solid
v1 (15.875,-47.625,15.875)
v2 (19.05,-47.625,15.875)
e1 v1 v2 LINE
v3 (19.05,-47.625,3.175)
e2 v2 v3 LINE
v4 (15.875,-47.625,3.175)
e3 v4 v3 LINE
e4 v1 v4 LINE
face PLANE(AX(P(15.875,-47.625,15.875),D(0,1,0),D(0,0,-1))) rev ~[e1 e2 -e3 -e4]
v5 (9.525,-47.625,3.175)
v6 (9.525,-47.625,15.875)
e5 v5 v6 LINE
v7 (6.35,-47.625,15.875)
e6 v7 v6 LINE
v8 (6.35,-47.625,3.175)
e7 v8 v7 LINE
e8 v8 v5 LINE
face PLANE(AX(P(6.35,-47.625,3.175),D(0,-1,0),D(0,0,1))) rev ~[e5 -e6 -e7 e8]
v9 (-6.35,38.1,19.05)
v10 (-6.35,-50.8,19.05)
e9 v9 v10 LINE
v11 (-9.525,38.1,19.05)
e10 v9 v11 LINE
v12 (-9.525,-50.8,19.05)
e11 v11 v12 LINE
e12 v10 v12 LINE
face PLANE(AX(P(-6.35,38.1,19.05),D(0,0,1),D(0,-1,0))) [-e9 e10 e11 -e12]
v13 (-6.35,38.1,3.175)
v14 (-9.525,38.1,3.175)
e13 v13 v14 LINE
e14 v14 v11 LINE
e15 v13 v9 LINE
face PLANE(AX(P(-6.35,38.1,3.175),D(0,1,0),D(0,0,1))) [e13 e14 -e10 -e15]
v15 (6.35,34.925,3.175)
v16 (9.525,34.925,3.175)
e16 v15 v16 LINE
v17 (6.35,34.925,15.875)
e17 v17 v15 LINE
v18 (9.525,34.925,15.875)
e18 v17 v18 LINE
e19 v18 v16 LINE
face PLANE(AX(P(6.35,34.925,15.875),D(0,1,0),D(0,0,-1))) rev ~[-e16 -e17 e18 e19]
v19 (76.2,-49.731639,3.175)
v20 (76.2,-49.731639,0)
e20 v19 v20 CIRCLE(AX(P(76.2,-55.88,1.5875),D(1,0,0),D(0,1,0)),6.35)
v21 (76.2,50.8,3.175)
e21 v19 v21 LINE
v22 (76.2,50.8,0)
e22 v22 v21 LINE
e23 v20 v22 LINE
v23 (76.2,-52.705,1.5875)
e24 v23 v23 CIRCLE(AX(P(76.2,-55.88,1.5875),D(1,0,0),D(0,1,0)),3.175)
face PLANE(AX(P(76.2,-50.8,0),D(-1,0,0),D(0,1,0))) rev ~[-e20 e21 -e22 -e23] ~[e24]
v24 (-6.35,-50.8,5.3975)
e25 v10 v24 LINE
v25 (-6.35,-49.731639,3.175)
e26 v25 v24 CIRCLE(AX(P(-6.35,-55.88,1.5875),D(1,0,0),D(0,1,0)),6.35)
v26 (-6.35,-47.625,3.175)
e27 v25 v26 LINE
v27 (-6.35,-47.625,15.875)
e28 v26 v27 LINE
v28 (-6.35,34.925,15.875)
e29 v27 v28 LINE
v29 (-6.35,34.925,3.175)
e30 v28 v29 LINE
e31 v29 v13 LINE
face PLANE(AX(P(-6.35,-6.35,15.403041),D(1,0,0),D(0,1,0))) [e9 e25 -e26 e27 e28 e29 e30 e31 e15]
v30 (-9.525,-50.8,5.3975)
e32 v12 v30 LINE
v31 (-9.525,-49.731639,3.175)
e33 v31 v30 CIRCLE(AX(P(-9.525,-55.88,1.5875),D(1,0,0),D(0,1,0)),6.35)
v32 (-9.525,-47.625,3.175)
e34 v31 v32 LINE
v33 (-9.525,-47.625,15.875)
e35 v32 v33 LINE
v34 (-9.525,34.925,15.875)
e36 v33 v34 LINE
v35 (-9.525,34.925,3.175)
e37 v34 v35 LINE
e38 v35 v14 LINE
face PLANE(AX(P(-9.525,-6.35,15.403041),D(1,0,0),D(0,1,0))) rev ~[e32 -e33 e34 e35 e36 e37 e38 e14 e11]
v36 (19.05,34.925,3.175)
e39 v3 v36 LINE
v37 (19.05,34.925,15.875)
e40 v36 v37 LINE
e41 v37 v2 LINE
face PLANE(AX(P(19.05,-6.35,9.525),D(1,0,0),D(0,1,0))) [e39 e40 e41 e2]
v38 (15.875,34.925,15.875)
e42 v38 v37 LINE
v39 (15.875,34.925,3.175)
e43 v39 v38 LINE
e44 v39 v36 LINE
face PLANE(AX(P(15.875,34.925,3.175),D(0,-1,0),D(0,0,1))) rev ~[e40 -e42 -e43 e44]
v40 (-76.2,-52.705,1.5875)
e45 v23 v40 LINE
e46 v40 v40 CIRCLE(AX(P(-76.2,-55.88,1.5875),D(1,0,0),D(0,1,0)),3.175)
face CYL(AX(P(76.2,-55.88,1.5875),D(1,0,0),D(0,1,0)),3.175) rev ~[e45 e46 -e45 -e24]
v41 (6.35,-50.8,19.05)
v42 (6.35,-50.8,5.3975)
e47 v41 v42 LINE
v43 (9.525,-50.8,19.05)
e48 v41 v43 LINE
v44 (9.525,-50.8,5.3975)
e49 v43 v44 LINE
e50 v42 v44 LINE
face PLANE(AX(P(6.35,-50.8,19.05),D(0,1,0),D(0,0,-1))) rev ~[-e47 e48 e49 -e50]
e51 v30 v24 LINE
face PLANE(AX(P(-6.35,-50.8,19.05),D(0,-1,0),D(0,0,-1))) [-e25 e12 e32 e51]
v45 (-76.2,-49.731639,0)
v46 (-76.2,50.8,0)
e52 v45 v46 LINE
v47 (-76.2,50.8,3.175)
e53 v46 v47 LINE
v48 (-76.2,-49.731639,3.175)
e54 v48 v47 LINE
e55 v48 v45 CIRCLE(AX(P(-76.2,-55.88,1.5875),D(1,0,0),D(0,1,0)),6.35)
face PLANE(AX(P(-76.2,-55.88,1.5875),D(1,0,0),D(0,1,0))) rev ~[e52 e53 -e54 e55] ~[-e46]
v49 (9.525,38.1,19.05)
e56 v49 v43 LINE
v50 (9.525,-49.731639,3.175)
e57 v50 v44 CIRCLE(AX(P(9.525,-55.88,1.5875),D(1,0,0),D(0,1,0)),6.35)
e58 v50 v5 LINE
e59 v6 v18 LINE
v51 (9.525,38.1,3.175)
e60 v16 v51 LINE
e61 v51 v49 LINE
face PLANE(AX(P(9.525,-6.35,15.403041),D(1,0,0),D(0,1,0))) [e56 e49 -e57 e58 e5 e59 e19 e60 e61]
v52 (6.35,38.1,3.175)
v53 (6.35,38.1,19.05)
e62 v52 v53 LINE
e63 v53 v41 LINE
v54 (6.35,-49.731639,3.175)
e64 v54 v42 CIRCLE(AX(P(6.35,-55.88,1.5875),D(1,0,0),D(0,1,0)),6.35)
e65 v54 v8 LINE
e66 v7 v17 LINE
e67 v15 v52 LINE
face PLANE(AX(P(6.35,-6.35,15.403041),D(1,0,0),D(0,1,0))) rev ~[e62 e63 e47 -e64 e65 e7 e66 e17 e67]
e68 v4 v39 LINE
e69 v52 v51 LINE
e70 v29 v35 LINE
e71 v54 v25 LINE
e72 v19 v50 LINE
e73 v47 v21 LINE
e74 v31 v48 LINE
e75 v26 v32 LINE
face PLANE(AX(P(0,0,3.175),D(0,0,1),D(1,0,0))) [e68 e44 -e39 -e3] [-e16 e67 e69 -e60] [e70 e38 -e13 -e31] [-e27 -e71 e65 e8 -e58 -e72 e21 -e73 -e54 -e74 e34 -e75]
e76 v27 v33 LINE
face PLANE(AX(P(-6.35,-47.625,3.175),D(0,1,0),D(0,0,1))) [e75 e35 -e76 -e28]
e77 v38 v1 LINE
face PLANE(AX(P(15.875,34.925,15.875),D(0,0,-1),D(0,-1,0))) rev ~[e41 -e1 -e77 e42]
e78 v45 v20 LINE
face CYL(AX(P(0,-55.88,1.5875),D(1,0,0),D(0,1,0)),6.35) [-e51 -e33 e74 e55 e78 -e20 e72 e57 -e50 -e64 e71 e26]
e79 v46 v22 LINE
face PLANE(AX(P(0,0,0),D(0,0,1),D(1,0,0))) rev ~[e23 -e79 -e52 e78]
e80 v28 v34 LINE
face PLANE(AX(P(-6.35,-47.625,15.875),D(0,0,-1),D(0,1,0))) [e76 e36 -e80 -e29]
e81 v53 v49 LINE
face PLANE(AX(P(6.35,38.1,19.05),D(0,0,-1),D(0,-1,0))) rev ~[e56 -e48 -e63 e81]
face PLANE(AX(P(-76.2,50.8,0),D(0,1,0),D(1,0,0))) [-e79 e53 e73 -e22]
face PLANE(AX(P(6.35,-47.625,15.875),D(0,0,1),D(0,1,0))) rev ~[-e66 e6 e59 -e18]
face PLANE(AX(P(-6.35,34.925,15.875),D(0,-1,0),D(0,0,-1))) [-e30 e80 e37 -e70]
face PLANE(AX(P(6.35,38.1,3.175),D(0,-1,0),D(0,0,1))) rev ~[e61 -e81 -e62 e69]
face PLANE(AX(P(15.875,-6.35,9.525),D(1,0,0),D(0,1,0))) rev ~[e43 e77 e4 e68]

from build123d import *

# Parameters (mm, degrees)
F0_W      = 152.4
F0_H      = 101.6
F1_DEPTH  = 3.175
F2_R      = 6.35
F3_DEPTH  = 76.2
F4_DEPTH  = 76.2
F5_R      = 3.175
F6_DEPTH  = 152.4
F10_DEPTH = 3.175
F13_DEPTH = 3.175
F16_DEPTH = 3.175


# Not quite as in the source:
# - a feature names something its author has since deleted; it is built from what else it names


with BuildPart() as f1:
    # F0 (on Top) → F1 (new body)
    with BuildSketch(Plane.XY):
        Rectangle(F0_W, F0_H)
    extrude(amount=F1_DEPTH)

    # F2 (on Right) → F3 (join)
    with BuildSketch(Plane.YZ):
        with Locations((-55.88, 1.5875)):
            Circle(F2_R)
    extrude(amount=F3_DEPTH)

    # F4 (add): a face of the model
    f4_faces = [f1.faces().sort_by_distance(p)[0] for p in [
        (0, -56.0567159254, 1.5875),
    ]]
    extrude(f4_faces, amount=F4_DEPTH)

    # F5 (on face) → F6 (cut)
    with BuildSketch(Plane.YZ.offset(76.2)):
        with Locations((-55.88, 1.5875)):
            Circle(F5_R)
    extrude(amount=-F6_DEPTH, mode=Mode.SUBTRACT)

    # F9 (on offset) → F10 (join)
    with BuildSketch(Plane.YZ.offset(6.35)):
        Polygon((-50.8, 3.175), (-47.625, 3.175), (-47.625, 15.875), (34.925, 15.875), (34.925, 3.175), (38.1, 3.175), (38.1, 19.05), (-50.8, 19.05), align=None)
    extrude(amount=F10_DEPTH)

    # F12 (on offset) → F13 (join)
    with BuildSketch(Plane.YZ.offset(-6.35)):
        Polygon((-50.8, 3.175), (-47.625, 3.175), (-47.625, 15.875), (34.925, 15.875), (34.925, 3.175), (38.1, 3.175), (38.1, 19.05), (-50.8, 19.05), align=None)
    extrude(amount=-F13_DEPTH)

    # F15 (on offset) → F16 (join)
    with BuildSketch(Plane.YZ.offset(15.875)):
        Polygon((-47.625, 15.875), (-47.625, 3.175), (-47.3777212979, 3.175), (34.925, 3.175), (34.925, 15.875), align=None)
    extrude(amount=F16_DEPTH)


solid = f1.part
